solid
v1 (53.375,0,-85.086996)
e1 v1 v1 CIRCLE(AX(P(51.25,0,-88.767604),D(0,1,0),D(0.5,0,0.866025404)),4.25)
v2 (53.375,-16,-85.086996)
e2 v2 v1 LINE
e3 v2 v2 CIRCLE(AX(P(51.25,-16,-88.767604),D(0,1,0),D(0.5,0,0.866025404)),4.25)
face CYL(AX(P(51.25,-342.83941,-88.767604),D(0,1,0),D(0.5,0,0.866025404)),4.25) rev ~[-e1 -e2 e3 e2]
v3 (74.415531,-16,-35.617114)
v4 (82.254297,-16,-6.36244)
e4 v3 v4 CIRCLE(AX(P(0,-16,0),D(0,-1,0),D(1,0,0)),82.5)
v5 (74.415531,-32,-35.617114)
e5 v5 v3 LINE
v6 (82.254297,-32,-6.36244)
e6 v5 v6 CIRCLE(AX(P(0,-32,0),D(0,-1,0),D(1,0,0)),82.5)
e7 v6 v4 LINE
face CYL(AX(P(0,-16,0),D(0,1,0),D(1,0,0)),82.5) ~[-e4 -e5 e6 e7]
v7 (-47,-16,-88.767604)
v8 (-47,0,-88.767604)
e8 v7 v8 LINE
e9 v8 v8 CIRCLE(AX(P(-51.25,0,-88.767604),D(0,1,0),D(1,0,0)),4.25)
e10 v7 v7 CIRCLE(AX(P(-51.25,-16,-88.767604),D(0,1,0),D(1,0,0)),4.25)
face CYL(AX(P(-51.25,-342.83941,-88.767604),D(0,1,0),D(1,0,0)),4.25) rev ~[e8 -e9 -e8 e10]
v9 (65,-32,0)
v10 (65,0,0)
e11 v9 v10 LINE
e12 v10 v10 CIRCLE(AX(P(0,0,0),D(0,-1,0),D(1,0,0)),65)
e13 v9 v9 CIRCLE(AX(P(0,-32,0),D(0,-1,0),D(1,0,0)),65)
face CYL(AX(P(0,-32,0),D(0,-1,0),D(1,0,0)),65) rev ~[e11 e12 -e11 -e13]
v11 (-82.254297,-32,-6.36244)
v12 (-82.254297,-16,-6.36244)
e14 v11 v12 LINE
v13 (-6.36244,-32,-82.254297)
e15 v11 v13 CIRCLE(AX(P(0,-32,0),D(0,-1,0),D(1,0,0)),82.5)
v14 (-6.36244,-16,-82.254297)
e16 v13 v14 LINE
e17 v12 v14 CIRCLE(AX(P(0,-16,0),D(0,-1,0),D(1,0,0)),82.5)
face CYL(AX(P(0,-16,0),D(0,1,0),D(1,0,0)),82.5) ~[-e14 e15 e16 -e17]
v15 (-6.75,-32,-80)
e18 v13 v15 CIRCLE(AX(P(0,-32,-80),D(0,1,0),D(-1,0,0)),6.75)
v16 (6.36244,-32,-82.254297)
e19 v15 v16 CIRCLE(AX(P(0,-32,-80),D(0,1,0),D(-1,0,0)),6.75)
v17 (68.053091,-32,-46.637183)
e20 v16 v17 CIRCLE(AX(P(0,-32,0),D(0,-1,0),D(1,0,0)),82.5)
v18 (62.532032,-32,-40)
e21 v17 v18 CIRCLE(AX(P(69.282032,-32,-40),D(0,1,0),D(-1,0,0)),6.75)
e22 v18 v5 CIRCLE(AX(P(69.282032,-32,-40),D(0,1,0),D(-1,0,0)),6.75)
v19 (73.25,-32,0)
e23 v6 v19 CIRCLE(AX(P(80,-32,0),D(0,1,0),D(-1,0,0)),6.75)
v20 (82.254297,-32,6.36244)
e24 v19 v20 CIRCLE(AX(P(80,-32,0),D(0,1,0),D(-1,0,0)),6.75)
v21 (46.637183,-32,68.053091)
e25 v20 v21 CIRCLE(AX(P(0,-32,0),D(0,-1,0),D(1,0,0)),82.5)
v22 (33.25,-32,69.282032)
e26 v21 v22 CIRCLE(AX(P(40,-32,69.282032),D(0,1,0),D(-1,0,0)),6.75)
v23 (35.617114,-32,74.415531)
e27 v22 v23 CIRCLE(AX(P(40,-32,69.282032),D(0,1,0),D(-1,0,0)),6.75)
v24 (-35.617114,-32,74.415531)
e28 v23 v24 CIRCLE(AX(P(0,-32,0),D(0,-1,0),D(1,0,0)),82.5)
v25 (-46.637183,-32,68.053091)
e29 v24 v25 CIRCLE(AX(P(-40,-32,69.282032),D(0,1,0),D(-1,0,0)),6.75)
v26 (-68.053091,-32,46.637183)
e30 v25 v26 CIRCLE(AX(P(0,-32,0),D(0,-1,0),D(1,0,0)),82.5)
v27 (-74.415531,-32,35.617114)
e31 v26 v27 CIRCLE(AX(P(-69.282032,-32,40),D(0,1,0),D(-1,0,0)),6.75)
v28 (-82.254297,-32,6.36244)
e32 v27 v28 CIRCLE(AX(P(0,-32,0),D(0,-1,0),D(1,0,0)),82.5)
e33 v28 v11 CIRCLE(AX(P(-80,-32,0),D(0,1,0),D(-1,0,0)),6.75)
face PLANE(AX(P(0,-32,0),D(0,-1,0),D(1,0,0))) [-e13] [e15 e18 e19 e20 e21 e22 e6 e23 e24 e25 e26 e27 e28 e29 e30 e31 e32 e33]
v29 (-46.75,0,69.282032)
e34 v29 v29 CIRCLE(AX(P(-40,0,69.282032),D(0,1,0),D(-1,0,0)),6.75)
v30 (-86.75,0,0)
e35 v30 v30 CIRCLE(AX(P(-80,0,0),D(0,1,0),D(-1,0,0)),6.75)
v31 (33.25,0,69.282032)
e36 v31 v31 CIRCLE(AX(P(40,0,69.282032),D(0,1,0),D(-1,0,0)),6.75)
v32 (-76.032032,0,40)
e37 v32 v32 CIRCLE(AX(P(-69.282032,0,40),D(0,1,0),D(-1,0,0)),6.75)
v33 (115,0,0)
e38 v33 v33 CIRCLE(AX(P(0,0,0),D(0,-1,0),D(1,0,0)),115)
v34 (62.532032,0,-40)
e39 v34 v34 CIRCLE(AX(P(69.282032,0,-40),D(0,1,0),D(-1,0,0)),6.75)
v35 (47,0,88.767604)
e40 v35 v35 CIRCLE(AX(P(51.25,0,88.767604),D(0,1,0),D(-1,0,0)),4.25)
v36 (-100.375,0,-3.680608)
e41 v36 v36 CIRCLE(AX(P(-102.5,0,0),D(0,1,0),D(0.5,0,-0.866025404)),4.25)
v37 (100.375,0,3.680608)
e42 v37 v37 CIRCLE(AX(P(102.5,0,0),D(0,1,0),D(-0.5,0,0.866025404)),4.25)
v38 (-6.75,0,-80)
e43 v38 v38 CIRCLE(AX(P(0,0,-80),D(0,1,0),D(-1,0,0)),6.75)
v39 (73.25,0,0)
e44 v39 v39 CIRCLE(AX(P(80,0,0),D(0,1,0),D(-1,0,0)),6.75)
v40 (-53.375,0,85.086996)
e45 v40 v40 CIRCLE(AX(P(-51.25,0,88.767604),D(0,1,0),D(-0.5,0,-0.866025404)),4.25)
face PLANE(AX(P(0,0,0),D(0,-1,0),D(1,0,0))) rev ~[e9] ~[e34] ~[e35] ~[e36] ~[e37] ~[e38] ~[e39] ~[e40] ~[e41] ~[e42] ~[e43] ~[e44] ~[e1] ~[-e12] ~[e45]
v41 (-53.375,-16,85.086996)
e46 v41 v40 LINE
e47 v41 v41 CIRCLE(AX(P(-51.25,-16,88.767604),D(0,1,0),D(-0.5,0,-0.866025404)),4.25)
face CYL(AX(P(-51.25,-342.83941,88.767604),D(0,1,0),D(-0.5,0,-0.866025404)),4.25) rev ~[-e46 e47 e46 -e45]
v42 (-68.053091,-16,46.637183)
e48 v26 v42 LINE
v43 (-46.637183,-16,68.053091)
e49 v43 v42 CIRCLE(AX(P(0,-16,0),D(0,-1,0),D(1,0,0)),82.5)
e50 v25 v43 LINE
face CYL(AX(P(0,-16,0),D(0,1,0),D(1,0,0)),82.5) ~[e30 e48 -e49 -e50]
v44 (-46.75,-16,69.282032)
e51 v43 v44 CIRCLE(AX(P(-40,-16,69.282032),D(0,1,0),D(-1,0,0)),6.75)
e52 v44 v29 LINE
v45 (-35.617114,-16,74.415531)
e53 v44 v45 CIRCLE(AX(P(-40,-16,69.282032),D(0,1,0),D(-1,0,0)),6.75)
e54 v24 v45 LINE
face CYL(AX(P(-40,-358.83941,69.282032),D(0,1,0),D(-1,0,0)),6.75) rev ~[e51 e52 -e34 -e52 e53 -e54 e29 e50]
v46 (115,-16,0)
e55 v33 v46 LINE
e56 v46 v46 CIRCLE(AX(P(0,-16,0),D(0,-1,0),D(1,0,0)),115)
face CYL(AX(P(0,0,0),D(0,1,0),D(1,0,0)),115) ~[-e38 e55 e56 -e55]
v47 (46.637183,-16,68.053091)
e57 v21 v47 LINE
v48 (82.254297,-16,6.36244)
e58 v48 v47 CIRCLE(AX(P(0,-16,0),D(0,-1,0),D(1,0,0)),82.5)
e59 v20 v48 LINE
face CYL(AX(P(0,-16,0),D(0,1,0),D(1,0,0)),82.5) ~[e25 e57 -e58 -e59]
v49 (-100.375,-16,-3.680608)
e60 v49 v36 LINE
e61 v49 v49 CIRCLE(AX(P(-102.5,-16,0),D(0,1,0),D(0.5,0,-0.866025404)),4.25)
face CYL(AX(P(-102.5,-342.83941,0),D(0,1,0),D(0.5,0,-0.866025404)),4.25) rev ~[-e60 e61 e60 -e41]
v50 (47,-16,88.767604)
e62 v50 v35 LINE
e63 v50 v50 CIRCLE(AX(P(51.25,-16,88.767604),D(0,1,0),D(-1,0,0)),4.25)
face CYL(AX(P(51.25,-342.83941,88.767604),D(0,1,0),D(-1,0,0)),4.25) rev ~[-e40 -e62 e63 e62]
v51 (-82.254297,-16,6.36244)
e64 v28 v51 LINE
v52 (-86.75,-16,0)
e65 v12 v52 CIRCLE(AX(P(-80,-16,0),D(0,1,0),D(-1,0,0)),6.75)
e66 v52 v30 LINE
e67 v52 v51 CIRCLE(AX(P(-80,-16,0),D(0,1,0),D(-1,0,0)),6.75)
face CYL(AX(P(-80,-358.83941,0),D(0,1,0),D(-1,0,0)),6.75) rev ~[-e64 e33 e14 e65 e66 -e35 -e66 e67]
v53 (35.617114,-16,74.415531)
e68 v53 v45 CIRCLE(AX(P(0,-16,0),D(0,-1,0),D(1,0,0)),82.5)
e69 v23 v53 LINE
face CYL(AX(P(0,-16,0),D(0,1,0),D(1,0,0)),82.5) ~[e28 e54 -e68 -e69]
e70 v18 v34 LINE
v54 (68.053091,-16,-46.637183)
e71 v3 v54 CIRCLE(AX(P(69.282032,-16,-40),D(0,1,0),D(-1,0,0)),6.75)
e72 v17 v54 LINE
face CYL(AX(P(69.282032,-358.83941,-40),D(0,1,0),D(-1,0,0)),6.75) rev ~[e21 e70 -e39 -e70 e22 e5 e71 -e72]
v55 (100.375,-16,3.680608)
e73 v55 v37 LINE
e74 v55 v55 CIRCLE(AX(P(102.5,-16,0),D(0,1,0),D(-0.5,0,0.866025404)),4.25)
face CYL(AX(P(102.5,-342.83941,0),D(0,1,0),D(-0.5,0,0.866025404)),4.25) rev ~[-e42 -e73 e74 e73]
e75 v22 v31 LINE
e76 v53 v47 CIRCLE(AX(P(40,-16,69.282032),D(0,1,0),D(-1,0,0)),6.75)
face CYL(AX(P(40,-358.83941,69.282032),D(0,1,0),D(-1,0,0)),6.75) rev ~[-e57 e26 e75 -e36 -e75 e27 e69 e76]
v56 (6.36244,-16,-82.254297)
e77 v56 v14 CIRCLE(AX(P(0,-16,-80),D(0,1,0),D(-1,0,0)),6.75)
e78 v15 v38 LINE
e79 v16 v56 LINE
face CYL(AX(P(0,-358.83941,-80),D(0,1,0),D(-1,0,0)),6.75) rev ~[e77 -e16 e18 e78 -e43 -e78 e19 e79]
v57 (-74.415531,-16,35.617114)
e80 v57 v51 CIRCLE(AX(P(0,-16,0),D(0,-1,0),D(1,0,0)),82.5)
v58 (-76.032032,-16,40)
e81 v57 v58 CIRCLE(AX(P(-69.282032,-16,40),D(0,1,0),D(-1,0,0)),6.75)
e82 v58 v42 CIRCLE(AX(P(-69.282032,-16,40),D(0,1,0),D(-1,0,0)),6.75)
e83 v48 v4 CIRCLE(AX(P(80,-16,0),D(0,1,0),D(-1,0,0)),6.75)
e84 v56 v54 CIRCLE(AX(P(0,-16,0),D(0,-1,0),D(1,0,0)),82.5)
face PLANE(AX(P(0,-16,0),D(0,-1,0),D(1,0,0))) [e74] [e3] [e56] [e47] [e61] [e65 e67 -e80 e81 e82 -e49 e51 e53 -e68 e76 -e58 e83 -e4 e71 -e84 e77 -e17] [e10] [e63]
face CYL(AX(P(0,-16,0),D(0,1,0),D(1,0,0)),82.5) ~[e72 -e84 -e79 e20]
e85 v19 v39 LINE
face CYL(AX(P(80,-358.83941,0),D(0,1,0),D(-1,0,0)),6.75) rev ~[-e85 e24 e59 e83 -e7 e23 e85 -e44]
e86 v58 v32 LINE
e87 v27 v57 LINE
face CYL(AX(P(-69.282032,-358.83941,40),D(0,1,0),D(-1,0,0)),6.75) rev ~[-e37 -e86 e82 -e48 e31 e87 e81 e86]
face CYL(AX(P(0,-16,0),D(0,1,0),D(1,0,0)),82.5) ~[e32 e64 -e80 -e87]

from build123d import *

# Parameters (mm, degrees)
F0_R            = 115
F1_DEPTH        = 16
F2_R            = 82.5
F3_DEPTH        = 16
F4_R            = 65
F5_DEPTH        = 32.001
F7_D            = 13.5
F9_D            = 8.5
F9_COPIES_COUNT = 6


# Not quite as in the source:
# - a pattern or mirror of a feature is missing from the dataset's text; its kind, count and spacing are read off the source's solid


with BuildPart() as f1:
    # F0 (on Front) → F1 (new body)
    with BuildSketch(Plane.XZ):
        Circle(F0_R)
    extrude(amount=F1_DEPTH)

    # F2 (on face) → F3 (join)
    with BuildSketch(Plane.XZ.offset(16)):
        Circle(F2_R)
    extrude(amount=F3_DEPTH)

    # F4 (on face) → F5 (cut, through all)
    with BuildSketch(Plane.XZ.offset(32)):
        Circle(F4_R)
    extrude(amount=-F5_DEPTH, mode=Mode.SUBTRACT)

    # F7 (through all)
    with Locations(Plane.XZ.offset(32)):
        with Locations((40, 69.2820323028), (80, 0), (69.2820323028, -40), (0, -80), (-80, 0), (-69.2820323028, 40), (-40, 69.2820323028)):
            Hole(F7_D / 2)

    # F9 (through all)
    with Locations(Plane.XZ.offset(16)):
        with Locations((51.25, 88.7676038879)):
            f9 = Hole(F9_D / 2)

    # F9_copies: F9 ×6 about axis
    f9_copies_axis = Axis((0, 0, 0), (0, 1, 0))
    for i in range(1, F9_COPIES_COUNT):
        add(f9.rotate(f9_copies_axis, i * 360 / F9_COPIES_COUNT), mode=Mode.SUBTRACT)


solid = f1.part
